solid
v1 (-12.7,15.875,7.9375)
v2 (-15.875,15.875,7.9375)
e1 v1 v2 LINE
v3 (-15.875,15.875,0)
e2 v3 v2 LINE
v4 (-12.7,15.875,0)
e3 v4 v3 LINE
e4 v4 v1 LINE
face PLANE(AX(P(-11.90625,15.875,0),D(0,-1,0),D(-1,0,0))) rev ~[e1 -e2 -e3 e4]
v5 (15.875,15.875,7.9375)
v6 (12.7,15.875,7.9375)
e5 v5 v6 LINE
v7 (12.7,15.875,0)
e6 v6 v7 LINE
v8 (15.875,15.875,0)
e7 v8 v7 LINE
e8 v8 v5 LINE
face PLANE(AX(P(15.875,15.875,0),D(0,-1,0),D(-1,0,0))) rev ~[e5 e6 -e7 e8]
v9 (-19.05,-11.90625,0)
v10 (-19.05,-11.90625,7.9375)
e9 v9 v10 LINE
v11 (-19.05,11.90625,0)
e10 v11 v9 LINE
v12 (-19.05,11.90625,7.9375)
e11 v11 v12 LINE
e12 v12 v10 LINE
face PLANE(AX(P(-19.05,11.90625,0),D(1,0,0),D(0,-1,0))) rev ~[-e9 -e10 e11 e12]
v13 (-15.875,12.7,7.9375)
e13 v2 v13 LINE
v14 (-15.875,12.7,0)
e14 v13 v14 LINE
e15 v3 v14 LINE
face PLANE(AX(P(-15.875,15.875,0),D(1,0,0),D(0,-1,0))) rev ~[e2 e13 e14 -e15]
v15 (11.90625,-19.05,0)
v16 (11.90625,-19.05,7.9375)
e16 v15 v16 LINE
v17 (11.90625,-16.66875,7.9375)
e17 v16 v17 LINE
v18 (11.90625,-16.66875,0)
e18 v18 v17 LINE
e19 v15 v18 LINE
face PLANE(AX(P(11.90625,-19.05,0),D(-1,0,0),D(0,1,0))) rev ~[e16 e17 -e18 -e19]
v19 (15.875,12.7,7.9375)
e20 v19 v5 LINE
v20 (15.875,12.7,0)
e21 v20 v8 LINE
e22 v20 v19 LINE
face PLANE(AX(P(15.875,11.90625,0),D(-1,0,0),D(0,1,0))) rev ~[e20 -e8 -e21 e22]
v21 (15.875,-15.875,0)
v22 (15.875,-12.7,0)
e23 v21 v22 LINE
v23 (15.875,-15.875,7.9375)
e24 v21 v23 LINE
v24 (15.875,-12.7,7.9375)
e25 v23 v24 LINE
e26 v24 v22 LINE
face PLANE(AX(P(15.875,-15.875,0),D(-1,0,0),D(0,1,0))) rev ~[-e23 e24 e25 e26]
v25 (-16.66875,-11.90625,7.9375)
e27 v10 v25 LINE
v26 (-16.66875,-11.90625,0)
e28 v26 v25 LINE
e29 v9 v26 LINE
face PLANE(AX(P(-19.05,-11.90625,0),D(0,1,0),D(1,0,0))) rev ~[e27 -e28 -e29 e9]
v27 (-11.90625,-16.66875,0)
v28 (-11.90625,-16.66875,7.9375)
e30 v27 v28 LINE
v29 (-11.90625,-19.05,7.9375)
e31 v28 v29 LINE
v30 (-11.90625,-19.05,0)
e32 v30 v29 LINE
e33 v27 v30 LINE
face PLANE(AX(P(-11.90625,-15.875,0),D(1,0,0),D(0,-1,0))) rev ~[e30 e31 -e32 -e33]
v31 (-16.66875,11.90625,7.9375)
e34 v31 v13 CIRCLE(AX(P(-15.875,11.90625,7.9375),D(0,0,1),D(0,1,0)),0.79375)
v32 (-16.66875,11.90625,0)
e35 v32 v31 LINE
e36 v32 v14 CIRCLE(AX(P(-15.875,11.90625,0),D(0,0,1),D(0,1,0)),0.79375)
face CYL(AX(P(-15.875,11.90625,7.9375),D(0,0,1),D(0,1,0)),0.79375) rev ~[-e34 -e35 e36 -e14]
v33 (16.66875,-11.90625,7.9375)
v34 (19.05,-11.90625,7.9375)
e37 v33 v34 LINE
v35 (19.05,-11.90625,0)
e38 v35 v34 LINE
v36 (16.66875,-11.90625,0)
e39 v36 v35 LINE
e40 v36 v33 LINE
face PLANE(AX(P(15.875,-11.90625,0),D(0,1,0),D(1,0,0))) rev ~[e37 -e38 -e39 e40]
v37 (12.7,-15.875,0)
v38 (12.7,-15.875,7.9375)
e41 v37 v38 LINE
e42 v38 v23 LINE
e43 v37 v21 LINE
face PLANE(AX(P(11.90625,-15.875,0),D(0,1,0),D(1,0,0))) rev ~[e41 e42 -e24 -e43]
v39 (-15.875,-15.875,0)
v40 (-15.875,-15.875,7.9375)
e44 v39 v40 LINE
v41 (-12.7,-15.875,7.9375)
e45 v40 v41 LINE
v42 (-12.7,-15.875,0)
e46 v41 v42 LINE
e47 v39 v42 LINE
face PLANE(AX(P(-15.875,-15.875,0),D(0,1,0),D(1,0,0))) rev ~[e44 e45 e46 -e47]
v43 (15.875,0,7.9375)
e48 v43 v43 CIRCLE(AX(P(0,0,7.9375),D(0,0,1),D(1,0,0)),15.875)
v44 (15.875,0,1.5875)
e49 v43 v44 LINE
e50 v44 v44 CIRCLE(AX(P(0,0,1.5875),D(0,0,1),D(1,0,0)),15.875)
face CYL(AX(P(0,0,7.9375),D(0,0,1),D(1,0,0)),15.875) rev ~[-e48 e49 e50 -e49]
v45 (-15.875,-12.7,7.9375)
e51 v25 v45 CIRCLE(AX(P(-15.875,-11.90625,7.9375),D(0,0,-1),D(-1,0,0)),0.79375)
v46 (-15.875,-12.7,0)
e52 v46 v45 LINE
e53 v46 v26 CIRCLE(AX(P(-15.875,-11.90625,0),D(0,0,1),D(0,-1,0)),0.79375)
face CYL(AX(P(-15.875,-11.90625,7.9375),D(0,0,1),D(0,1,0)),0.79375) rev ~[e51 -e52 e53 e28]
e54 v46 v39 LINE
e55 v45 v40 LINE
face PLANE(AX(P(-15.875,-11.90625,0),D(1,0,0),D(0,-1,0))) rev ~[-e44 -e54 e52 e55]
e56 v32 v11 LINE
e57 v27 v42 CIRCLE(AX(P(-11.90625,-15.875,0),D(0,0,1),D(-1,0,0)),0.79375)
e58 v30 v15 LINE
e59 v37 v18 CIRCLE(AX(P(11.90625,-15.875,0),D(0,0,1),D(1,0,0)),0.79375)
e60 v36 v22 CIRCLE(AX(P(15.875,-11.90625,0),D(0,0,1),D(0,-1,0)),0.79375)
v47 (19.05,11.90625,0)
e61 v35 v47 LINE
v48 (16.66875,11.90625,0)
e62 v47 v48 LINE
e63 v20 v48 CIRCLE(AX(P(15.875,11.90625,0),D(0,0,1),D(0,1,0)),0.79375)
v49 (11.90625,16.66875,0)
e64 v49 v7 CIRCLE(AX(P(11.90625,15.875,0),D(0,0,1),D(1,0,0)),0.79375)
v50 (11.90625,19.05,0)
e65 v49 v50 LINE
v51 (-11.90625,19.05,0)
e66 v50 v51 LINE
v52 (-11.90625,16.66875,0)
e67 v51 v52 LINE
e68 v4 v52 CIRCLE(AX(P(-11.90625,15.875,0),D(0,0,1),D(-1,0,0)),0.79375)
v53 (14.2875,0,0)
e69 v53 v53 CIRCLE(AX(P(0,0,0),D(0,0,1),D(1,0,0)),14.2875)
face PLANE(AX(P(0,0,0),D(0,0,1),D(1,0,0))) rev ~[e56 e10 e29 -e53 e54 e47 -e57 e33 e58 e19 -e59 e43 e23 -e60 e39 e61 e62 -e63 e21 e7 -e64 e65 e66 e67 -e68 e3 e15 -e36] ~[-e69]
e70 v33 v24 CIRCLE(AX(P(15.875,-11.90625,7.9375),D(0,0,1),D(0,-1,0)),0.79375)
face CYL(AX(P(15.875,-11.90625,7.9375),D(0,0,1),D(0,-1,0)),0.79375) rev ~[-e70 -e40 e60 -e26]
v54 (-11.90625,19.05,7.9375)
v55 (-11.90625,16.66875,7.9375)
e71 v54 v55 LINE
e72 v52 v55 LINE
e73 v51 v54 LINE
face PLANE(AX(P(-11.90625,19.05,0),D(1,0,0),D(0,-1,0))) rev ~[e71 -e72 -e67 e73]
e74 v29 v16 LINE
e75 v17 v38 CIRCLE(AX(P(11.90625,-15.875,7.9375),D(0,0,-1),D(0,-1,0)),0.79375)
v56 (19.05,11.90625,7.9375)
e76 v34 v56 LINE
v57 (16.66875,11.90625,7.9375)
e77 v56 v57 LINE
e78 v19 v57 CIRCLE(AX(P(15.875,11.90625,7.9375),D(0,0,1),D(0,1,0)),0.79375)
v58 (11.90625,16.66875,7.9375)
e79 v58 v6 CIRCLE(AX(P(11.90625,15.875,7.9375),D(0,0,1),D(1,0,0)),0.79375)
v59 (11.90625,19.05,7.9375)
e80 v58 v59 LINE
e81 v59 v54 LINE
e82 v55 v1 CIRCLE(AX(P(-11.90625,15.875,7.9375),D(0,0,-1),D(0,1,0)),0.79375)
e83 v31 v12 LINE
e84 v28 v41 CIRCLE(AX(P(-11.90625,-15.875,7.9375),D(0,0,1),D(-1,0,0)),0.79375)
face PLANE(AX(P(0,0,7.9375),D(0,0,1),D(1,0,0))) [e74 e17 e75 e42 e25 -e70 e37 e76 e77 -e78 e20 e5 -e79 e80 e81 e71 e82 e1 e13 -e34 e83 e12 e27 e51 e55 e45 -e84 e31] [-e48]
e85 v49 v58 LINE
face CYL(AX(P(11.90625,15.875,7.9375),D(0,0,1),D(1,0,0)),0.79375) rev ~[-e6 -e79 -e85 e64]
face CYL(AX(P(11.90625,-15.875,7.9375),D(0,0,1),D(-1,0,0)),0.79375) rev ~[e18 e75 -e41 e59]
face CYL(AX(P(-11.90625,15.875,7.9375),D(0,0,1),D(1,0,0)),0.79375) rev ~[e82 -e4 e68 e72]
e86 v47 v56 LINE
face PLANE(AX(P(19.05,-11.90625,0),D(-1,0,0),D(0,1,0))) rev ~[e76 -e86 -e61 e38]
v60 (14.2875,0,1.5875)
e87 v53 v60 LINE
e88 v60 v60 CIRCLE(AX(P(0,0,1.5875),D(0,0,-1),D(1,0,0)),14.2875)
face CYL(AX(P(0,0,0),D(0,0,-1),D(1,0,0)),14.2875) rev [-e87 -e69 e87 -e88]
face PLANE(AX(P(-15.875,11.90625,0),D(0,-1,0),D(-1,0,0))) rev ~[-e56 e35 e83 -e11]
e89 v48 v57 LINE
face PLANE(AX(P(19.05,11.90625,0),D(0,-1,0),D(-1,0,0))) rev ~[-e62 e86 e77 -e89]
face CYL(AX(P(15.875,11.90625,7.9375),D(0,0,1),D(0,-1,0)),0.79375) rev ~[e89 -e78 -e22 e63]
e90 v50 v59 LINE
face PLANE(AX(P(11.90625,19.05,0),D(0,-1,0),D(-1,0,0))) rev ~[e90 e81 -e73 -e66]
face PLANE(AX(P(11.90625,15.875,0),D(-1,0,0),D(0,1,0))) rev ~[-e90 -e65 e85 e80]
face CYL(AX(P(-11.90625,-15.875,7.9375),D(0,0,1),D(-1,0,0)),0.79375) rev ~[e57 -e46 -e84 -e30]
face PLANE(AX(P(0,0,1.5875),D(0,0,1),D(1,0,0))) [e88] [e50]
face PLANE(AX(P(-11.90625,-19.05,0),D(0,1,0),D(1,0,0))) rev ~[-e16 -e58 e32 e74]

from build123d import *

# Parameters (mm, degrees)
F0_R            = 14.2875
F1_DEPTH        = 7.9375
F2_R            = 15.875
F3_DEPTH        = 6.35
F4_R            = 0.79375
F5_DEPTH        = 7.9375
F5_COPIES_COUNT = 4


# Not quite as in the source:
# - a pattern or mirror of a feature is missing from the dataset's text; its kind, count and spacing are read off the source's solid


with BuildPart() as f1:
    # F0 (on Top) → F1 (new body)
    with BuildSketch(Plane.XY):
        Polygon((19.05, 11.90625), (15.875, 11.90625), (15.875, 15.875), (11.90625, 15.875), (11.90625, 19.05), (-11.90625, 19.05), (-11.90625, 15.875), (-15.875, 15.875), (-15.875, 11.90625), (-19.05, 11.90625), (-19.05, -11.90625), (-15.875, -11.90625), (-15.875, -15.875), (-11.90625, -15.875), (-11.90625, -19.05), (11.90625, -19.05), (11.90625, -15.875), (15.875, -15.875), (15.875, -11.90625), (19.05, -11.90625), align=None)
        Circle(F0_R, mode=Mode.SUBTRACT)
    extrude(amount=F1_DEPTH)

    # F2 (on face) → F3 (cut)
    with BuildSketch(Plane.XY.offset(7.9375)):
        Circle(F2_R)
    extrude(amount=-F3_DEPTH, mode=Mode.SUBTRACT)

    # F4 (on face) → F5 (cut, through all)
    with BuildSketch(Plane.XY.offset(7.9375)):
        with Locations((11.90625, 15.875)):
            Circle(F4_R)
        with Locations((-11.90625, 15.875)):
            Circle(F4_R)
    f5 = extrude(amount=-F5_DEPTH, mode=Mode.SUBTRACT)

    # F5_copies: F5 ×4 about axis
    f5_copies_axis = Axis((0, 0, 0), (0, 0, 1))
    for i in range(1, F5_COPIES_COUNT):
        add(f5.rotate(f5_copies_axis, i * 360 / F5_COPIES_COUNT), mode=Mode.SUBTRACT)


solid = f1.part
